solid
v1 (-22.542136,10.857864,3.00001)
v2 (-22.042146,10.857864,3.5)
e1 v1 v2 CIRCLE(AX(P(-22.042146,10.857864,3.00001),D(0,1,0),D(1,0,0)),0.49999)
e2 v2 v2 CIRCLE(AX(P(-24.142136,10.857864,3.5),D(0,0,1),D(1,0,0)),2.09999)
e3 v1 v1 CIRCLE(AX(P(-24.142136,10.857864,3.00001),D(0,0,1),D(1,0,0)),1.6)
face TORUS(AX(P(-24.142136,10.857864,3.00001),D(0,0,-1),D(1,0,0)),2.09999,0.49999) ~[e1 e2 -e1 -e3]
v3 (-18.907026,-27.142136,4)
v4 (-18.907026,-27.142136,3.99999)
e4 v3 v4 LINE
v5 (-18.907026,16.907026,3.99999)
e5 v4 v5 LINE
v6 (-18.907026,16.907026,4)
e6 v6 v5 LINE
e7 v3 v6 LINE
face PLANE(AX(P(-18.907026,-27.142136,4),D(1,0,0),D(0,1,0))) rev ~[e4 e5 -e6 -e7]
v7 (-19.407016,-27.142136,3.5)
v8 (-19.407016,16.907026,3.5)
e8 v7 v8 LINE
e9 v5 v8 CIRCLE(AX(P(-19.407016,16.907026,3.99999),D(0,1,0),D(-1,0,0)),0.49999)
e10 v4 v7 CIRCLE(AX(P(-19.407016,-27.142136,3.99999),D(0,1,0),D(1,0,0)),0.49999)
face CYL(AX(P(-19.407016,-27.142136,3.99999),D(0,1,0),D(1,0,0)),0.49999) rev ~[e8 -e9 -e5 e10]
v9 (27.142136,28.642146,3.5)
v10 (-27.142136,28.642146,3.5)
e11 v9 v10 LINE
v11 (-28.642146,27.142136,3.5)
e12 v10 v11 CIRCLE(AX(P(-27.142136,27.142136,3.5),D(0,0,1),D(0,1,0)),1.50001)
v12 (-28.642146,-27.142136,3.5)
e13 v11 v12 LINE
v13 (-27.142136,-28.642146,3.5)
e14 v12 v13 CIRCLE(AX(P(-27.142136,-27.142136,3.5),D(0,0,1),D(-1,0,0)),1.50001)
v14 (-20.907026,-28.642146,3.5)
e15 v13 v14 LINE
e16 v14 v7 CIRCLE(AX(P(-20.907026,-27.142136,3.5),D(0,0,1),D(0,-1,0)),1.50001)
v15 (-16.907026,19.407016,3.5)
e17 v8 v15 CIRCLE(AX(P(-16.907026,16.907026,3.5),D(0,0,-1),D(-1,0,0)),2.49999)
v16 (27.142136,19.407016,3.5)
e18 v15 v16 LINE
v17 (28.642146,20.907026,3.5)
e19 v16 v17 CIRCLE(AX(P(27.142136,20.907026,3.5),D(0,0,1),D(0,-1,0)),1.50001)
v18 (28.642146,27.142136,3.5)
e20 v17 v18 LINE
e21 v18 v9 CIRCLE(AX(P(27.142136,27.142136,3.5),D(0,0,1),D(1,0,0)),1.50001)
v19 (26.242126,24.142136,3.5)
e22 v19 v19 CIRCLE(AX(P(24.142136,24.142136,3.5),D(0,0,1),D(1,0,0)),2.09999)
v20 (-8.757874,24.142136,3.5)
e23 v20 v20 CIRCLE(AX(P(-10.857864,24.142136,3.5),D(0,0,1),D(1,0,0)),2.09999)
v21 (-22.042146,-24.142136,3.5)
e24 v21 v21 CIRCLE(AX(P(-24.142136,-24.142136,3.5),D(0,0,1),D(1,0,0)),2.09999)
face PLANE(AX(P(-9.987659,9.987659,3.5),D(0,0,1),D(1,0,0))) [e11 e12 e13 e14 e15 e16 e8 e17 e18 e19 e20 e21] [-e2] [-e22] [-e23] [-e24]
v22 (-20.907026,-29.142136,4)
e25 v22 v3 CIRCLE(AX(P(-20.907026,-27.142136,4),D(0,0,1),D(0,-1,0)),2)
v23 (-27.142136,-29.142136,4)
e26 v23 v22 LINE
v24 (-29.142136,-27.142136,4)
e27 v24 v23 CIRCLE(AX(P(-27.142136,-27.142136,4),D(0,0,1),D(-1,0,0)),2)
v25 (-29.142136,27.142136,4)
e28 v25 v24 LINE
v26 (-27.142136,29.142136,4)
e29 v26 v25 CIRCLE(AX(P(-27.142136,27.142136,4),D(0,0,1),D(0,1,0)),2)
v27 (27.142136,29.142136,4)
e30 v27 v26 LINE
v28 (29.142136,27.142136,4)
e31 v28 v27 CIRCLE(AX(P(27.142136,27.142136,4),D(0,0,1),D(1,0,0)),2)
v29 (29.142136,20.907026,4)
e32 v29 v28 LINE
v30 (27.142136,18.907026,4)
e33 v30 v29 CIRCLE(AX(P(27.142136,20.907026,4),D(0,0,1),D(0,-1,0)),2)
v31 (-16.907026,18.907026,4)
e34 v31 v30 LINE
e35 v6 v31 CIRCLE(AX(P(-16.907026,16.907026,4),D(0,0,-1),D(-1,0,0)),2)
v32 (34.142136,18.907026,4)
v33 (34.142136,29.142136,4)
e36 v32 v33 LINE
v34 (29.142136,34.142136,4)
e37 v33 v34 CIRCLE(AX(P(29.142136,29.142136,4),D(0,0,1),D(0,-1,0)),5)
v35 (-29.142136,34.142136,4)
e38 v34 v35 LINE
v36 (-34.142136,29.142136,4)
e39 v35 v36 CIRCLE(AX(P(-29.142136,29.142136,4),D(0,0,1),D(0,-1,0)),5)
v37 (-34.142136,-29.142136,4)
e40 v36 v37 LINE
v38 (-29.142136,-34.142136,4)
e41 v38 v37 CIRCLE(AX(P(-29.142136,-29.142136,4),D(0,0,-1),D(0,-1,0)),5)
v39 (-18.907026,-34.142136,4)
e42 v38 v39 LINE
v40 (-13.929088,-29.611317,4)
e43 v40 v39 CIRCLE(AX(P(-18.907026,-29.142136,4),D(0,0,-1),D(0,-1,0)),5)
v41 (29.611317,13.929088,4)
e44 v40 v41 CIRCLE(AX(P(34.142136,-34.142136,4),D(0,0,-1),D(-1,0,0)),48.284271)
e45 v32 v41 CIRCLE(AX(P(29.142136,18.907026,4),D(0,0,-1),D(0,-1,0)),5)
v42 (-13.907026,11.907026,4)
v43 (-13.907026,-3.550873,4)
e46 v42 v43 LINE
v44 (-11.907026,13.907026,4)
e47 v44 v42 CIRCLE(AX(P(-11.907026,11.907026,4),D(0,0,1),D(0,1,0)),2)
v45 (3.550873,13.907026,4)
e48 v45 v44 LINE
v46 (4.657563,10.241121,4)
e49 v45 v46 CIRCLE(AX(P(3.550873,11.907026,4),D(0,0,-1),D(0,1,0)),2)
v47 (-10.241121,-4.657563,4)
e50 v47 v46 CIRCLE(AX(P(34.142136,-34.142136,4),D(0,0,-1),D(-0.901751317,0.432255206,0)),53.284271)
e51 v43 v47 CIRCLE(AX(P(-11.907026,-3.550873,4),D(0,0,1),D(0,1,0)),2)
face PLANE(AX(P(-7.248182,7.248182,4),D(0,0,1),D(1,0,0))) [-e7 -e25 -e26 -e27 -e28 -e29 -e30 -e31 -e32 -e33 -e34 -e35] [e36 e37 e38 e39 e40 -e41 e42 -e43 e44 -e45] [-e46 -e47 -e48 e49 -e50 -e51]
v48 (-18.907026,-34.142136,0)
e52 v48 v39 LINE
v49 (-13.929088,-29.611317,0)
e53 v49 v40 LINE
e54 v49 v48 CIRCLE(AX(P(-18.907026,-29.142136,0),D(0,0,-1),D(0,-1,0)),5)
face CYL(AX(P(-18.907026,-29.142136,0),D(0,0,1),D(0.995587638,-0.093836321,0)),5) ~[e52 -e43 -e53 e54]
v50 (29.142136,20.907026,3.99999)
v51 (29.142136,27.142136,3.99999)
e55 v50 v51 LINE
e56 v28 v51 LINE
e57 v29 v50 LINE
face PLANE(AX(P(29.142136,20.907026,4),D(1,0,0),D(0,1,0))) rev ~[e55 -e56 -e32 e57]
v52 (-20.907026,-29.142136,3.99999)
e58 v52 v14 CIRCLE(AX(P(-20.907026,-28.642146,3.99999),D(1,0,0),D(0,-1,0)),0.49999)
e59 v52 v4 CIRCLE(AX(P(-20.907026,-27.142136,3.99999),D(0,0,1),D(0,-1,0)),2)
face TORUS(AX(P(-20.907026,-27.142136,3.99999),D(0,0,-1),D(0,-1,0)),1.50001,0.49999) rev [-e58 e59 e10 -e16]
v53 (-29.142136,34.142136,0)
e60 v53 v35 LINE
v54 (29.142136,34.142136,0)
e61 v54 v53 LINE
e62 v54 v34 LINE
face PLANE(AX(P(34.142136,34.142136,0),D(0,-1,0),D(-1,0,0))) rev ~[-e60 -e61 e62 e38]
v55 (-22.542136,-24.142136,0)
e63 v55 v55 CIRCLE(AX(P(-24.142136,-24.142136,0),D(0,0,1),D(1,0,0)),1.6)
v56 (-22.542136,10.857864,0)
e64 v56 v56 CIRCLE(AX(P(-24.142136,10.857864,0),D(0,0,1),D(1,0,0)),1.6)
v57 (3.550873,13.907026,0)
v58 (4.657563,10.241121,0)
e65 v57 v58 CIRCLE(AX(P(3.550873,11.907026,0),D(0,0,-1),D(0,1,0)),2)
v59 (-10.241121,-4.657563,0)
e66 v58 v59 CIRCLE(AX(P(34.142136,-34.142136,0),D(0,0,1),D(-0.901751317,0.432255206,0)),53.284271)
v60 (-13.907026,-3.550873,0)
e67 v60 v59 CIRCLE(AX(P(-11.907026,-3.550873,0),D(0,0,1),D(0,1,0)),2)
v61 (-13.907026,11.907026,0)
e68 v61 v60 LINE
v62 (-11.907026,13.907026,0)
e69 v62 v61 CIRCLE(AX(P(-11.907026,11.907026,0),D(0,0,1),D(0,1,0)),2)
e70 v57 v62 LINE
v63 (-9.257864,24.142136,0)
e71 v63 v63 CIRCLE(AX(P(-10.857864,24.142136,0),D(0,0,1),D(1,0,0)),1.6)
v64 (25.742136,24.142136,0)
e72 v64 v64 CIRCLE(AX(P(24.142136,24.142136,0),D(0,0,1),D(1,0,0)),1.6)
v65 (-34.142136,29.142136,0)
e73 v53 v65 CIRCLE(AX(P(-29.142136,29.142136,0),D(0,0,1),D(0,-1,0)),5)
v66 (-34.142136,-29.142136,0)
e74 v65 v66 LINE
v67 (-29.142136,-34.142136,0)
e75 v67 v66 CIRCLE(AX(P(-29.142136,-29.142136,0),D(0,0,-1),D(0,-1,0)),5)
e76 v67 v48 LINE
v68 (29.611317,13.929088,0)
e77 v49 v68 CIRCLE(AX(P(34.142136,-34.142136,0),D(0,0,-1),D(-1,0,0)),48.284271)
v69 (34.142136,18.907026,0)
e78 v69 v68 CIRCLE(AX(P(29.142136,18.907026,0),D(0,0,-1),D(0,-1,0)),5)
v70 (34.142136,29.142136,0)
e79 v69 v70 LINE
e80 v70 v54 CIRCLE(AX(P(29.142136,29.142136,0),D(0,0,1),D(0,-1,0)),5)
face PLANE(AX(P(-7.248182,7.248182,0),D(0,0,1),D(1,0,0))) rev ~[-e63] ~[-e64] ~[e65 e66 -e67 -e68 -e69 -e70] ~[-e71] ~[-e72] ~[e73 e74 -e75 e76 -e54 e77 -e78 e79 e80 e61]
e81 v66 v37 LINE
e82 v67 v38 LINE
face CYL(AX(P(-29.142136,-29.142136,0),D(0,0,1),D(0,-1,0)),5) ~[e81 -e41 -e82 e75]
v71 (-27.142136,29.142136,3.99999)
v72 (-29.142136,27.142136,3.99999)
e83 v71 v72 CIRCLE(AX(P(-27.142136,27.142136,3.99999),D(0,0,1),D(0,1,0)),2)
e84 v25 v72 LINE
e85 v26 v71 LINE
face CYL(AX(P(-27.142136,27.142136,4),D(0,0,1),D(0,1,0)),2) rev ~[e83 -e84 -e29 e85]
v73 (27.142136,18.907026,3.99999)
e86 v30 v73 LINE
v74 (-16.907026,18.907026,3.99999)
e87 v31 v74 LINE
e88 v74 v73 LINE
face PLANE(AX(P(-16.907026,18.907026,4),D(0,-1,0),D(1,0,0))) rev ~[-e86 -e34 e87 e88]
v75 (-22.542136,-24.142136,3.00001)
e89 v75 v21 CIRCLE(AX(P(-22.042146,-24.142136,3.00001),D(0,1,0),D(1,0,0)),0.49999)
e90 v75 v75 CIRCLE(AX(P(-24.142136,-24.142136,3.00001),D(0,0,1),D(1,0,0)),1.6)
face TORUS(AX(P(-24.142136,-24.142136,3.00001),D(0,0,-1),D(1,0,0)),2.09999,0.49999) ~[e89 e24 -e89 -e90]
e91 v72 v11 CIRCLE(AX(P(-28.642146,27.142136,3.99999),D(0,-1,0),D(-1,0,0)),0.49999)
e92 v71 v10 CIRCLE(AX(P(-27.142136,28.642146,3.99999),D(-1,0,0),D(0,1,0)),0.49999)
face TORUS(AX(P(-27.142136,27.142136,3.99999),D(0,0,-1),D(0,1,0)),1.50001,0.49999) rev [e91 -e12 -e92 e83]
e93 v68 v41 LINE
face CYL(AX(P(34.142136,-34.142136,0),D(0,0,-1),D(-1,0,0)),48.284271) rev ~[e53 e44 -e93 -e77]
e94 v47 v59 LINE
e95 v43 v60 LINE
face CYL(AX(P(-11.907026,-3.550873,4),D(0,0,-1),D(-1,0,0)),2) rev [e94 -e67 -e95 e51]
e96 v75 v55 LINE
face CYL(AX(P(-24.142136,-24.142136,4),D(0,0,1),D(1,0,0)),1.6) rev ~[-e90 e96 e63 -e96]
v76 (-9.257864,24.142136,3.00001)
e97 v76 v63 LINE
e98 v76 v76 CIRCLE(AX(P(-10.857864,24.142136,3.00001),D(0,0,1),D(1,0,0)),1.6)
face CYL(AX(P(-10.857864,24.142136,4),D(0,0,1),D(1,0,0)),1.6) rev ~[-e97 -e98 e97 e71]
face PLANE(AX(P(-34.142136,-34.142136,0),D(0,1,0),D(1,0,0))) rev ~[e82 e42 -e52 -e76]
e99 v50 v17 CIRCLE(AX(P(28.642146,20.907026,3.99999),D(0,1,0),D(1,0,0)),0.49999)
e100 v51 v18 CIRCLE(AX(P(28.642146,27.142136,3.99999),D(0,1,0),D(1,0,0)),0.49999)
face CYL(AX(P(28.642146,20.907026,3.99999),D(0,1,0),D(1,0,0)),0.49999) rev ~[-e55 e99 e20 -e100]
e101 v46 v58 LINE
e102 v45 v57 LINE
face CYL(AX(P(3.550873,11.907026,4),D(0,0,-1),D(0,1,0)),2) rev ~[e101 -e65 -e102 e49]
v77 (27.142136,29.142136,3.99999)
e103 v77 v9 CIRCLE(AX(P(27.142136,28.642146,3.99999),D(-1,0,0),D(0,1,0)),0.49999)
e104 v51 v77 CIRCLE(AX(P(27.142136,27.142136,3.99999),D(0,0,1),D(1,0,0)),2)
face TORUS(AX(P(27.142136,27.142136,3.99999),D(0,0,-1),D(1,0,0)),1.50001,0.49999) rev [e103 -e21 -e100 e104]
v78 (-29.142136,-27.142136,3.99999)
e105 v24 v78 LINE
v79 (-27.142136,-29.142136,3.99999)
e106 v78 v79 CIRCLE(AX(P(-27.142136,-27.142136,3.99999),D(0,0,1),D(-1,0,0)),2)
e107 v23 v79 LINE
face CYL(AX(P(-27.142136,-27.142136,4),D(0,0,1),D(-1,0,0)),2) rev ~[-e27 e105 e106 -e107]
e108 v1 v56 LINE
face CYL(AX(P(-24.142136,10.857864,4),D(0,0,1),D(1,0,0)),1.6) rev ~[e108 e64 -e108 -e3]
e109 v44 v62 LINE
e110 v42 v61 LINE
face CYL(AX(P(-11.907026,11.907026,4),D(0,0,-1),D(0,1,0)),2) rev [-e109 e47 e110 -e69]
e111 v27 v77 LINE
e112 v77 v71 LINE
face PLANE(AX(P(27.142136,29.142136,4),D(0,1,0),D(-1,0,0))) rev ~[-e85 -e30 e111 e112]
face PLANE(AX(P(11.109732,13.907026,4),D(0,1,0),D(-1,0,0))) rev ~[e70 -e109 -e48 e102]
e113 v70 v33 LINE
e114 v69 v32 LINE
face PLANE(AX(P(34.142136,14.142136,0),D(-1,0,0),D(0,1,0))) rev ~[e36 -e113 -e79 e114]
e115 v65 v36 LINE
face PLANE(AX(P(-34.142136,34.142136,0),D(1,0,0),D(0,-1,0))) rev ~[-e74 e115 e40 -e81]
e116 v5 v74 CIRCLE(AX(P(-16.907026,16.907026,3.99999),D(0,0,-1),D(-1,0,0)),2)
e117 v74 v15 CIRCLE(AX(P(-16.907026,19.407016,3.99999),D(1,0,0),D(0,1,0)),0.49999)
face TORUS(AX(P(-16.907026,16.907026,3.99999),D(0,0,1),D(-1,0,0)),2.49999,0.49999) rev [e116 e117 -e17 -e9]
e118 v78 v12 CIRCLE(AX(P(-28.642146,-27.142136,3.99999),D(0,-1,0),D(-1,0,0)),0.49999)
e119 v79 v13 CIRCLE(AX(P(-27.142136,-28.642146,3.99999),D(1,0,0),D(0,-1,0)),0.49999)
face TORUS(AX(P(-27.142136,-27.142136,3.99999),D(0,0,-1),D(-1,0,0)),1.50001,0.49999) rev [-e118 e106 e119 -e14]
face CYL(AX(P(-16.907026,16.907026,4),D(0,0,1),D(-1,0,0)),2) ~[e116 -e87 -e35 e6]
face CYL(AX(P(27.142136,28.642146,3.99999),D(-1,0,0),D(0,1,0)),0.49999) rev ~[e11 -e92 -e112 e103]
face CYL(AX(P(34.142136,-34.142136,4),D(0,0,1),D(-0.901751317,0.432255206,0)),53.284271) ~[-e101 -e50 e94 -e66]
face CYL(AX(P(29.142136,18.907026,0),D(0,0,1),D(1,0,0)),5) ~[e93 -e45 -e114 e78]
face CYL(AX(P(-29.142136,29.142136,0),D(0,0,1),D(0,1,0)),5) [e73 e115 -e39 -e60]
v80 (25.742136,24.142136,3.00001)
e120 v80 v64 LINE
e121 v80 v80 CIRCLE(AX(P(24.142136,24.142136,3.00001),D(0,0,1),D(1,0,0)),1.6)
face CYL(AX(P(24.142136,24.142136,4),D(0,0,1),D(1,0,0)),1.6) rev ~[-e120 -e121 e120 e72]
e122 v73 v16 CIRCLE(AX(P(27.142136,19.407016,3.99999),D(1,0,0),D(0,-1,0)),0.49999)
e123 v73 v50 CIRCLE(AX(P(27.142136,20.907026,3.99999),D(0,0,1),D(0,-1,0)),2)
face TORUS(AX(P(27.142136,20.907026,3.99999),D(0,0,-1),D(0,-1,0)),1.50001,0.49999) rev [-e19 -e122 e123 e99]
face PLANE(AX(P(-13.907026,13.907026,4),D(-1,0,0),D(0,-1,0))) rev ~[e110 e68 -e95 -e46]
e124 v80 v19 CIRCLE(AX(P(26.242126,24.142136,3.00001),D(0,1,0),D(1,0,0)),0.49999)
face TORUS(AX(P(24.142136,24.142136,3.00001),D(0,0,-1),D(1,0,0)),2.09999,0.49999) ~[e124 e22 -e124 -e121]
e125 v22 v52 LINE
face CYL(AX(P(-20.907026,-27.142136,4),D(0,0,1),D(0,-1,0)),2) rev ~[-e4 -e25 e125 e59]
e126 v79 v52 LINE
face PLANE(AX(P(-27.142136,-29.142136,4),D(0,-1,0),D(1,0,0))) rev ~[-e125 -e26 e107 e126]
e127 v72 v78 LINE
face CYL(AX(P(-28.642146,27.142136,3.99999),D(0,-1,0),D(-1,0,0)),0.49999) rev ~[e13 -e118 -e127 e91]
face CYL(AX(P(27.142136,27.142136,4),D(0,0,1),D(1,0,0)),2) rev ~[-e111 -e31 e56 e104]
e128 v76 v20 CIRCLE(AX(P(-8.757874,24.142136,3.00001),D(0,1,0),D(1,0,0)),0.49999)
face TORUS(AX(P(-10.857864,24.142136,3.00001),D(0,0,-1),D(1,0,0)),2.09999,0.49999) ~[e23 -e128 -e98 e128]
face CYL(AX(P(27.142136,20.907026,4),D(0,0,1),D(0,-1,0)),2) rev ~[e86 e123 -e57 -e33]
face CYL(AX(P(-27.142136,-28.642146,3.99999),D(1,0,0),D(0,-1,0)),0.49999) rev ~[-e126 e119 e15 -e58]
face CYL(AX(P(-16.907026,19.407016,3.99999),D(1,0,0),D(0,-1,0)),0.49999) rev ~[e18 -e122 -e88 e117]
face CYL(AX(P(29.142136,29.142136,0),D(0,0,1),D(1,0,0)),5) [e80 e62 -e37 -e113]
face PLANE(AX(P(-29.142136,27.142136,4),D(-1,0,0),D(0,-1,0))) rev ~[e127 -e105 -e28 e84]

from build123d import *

# Parameters (mm, degrees)
F1_DEPTH = 4
F2_R     = 1.6
F3_DEPTH = 4.001
F4_R     = 5
F5_R     = 1.6
F6_DEPTH = 0.5
F7_R     = 0.49999
F9_DEPTH = 4.001
F10_R    = 2


# Not quite as in the source:
# - a fillet or chamfer is up to 0.001 mm smaller than in the source, because OpenCascade refuses the exact size


with BuildPart() as f1:
    # F0 (on Top) → F1 (new body)
    with BuildSketch(Plane.XY):
        with BuildLine():
            Line((34.1421356237, 14.1421356237), (34.1421356237, 34.1421356237))
            Line((34.1421356237, 34.1421356237), (-34.1421356237, 34.1421356237))
            Line((-34.1421356237, 34.1421356237), (-34.1421356237, -34.1421356237))
            Line((-34.1421356237, -34.1421356237), (-14.1421356237, -34.1421356237))
            ThreePointArc((-14.1421356237, -34.1421356237), (0, 0), (34.1421356237, 14.1421356237))
        make_face()
    extrude(amount=F1_DEPTH)

    # F2 (on face) → F3 (cut, through all)
    with BuildSketch(Plane.XY.offset(4)):
        with Locations((-24.1421356237, -24.1421356237)):
            Circle(F2_R)
        with Locations((-10.8578643763, 24.1421356237)):
            Circle(F2_R)
        with Locations((24.1421356237, 24.1421356237)):
            Circle(F2_R)
        with Locations((-24.1421356237, 10.8578643763)):
            Circle(F2_R)
    extrude(amount=-F3_DEPTH, mode=Mode.SUBTRACT)

    # F4
    f4_edges = [f1.edges().sort_by_distance(p)[0] for p in [
        (-14.142136, -34.142136, 2),
        (-34.142136, -34.142136, 2),
        (34.142136, 14.142136, 2),
        (34.142136, 34.142136, 2),
        (-34.142136, 34.142136, 2),
    ]]
    fillet(f4_edges, radius=F4_R)

    # F5 (on face) → F6 (cut)
    with BuildSketch(Plane.XY.offset(4)):
        with BuildLine():
            ThreePointArc((29.1421356237, 27.1421356237), (28.5563491861, 28.5563491861), (27.1421356237, 29.1421356237))
            Line((27.1421356237, 29.1421356237), (-27.1421356237, 29.1421356237))
            ThreePointArc((-27.1421356237, 29.1421356237), (-28.5563491861, 28.5563491861), (-29.1421356237, 27.1421356237))
            Line((-29.1421356237, 27.1421356237), (-29.1421356237, -27.1421356237))
            ThreePointArc((-29.1421356237, -27.1421356237), (-28.5563491861, -28.5563491861), (-27.1421356237, -29.1421356237))
            Line((-27.1421356237, -29.1421356237), (-20.9070261262, -29.1421356237))
            ThreePointArc((-20.9070261262, -29.1421356237), (-19.4928125639, -28.5563491861), (-18.9070261262, -27.1421356237))
            Line((-18.9070261262, -27.1421356237), (-18.9070261262, 16.9070261262))
            ThreePointArc((-18.9070261262, 16.9070261262), (-18.3212396886, 18.3212396886), (-16.9070261262, 18.9070261262))
            Line((-16.9070261262, 18.9070261262), (27.1421356237, 18.9070261262))
            ThreePointArc((27.1421356237, 18.9070261262), (28.5563491861, 19.4928125639), (29.1421356237, 20.9070261262))
            Line((29.1421356237, 20.9070261262), (29.1421356237, 27.1421356237))
        make_face()
        with Locations((-24.1421356237, -24.1421356237)):
            Circle(F5_R, mode=Mode.SUBTRACT)
        with Locations((-24.1421356237, 10.8578643763)):
            Circle(F5_R, mode=Mode.SUBTRACT)
        with Locations((-10.8578643763, 24.1421356237)):
            Circle(F5_R, mode=Mode.SUBTRACT)
        with Locations((24.1421356237, 24.1421356237)):
            Circle(F5_R, mode=Mode.SUBTRACT)
    extrude(amount=-F6_DEPTH, mode=Mode.SUBTRACT)

    # F7 (radius 0.5 in the source; OpenCascade refuses exactly that, so slightly less here)
    f7_edges = [f1.edges().sort_by_distance(p)[0] for p in [
        (-18.32124, 18.32124, 3.5),
        (5.117555, 18.907026, 3.5),
        (28.556349, 19.492813, 3.5),
        (29.142136, 24.024581, 3.5),
        (28.556349, 28.556349, 3.5),
        (0, 29.142136, 3.5),
        (-28.556349, 28.556349, 3.5),
        (-29.142136, 0, 3.5),
        (-28.556349, -28.556349, 3.5),
        (-24.024581, -29.142136, 3.5),
        (-19.492813, -28.556349, 3.5),
        (-18.907026, -5.117555, 3.5),
        (-25.742136, -24.142136, 3.5),
        (-25.742136, 10.857864, 3.5),
        (-12.457864, 24.142136, 3.5),
        (22.542136, 24.142136, 3.5),
    ]]
    fillet(f7_edges, radius=F7_R)

    # F8 (on face) → F9 (cut, through all)
    with BuildSketch(Plane.XY.offset(4)):
        with BuildLine():
            ThreePointArc((-13.9070261262, -11.1097319823), (-3.5355339059, 3.5355339059), (11.1097319823, 13.9070261262))
            Line((11.1097319823, 13.9070261262), (-13.9070261262, 13.9070261262))
            Line((-13.9070261262, 13.9070261262), (-13.9070261262, -11.1097319823))
        make_face()
    extrude(amount=-F9_DEPTH, mode=Mode.SUBTRACT)

    # F10
    f10_edges = [f1.edges().sort_by_distance(p)[0] for p in [
        (-13.907026, 13.907026, 2),
        (-13.907026, -11.109732, 2),
        (11.109732, 13.907026, 2),
    ]]
    fillet(f10_edges, radius=F10_R)


solid = f1.part
